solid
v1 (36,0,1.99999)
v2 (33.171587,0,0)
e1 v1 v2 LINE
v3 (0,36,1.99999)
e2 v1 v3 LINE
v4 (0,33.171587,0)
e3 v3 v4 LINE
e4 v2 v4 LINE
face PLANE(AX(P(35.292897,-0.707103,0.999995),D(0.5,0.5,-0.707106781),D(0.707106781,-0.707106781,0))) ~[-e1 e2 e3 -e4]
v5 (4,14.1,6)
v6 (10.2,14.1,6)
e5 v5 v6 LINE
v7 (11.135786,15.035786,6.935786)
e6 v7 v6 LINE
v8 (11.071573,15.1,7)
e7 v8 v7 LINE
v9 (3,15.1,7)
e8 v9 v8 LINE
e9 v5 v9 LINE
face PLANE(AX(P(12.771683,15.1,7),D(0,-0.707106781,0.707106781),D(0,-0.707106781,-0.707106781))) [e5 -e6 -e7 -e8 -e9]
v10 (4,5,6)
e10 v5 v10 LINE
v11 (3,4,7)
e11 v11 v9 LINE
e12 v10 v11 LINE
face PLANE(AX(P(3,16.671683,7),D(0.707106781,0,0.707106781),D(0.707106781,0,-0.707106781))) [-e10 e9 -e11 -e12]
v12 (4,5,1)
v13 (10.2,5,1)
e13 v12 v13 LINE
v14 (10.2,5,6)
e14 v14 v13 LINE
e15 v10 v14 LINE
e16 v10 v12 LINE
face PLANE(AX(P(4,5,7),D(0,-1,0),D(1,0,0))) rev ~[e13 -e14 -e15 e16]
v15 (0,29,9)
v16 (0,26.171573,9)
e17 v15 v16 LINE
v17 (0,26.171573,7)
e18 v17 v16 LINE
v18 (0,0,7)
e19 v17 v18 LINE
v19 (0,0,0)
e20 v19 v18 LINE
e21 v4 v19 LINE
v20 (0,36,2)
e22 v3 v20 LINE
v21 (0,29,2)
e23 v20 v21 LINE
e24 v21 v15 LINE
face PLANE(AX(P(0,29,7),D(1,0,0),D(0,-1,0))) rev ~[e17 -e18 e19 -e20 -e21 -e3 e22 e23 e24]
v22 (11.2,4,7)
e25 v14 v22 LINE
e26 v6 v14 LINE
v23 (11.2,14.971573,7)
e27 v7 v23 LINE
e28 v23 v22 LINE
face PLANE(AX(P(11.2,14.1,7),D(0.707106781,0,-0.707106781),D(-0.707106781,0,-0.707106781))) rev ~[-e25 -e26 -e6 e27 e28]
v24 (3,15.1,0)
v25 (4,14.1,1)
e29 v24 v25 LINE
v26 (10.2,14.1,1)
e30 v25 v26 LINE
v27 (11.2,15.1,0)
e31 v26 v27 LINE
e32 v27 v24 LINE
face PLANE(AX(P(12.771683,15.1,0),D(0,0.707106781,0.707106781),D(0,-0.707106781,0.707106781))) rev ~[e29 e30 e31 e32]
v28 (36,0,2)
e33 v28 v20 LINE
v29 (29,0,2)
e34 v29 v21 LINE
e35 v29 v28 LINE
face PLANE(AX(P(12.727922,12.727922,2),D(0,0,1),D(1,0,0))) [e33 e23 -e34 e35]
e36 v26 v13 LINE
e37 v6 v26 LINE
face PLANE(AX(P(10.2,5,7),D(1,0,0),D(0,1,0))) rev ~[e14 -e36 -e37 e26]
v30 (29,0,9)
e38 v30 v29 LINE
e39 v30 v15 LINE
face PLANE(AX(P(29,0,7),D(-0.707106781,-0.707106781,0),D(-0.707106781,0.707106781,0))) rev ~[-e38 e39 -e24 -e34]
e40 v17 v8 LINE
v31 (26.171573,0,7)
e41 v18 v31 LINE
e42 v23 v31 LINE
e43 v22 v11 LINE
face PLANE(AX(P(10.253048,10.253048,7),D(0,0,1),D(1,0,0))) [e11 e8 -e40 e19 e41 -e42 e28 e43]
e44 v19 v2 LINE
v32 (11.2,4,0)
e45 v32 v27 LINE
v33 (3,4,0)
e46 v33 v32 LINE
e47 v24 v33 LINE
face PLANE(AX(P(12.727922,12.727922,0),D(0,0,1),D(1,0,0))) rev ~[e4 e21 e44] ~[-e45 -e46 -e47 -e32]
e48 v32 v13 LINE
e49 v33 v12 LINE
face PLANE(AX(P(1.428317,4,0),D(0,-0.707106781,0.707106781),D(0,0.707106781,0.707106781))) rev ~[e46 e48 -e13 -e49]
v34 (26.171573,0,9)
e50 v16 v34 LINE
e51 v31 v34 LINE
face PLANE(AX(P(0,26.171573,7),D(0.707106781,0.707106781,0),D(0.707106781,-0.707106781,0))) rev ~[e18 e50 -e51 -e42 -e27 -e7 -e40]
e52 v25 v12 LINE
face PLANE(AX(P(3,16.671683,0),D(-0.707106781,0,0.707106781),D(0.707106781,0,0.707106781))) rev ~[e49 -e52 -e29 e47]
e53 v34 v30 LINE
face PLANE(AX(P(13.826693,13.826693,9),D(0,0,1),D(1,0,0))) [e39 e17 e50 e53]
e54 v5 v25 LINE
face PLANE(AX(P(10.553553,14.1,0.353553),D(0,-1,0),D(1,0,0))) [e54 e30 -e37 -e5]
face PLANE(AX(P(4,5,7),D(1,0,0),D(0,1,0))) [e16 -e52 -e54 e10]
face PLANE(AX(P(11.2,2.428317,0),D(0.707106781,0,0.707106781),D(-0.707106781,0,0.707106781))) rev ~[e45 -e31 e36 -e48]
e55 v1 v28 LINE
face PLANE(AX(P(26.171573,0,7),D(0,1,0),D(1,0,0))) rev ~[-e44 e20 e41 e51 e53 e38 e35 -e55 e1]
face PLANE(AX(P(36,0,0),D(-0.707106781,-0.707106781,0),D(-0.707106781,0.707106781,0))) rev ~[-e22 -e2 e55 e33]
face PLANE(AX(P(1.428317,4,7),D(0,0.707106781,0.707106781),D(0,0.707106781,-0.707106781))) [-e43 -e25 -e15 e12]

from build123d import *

# Parameters (mm, degrees)
F1_DEPTH     = 2
F3_DEPTH     = 5
F5_DEPTH     = 2
F6_W         = 6.2
F6_H         = 9.1
F7_DEPTH     = 7.001
F8_T1_DEPTH  = 9.1
F8_T3_DEPTH  = 6.2
F8_T9_DEPTH  = 8.771682988
F8_T13_DEPTH = 11.671682988
F8_T20_DEPTH = 11.671682988
F8_T24_DEPTH = 8.771682988
F8_T31_DEPTH = 8.771682988
F8_T36_DEPTH = 11.671682988
F8_T44_DEPTH = 8.771682988
F8_T48_DEPTH = 11.671682988
F8_T55_DEPTH = 8.771682988
F8_T59_DEPTH = 11.671682988
F8_T66_DEPTH = 8.771682988
F8_T70_DEPTH = 11.671682988
F8_T77_DEPTH = 8.771682988
F8_T81_DEPTH = 11.671682988
F8_T88_DEPTH = 11.671682988
F8_T92_DEPTH = 8.771682988
F9_SIZE      = 1.99999


# Not quite as in the source:
# - a fillet or chamfer that OpenCascade refuses, or shapes differently, is made with other operations: its cross-section is extruded or revolved along the edge and cut away or added
# - a fillet or chamfer is up to 0.001 mm smaller than in the source, because OpenCascade refuses the exact size


with BuildPart() as f1:
    # F0 (on Top) → F1 (new body)
    with BuildSketch(Plane.XY):
        Polygon((0, 36), (0, 0), (36, 0), align=None)
    extrude(amount=F1_DEPTH)

    # F2 (on face) → F3 (join)
    with BuildSketch(Plane.XY.offset(2)):
        Polygon((0, 29), (0, 0), (29, 0), align=None)
    extrude(amount=F3_DEPTH)

    # F4 (on face) → F5 (join)
    with BuildSketch(Plane.XY.offset(7)):
        Polygon((29, 0), (0, 29), (0, 26.1715728753), (26.1715728753, 0), align=None)
    extrude(amount=F5_DEPTH)

    # F6 (on face) → F7 (cut, through all)
    with BuildSketch(Plane.XY.offset(7)):
        with Locations((7.1, 9.55)):
            Rectangle(F6_W, F6_H)
    extrude(amount=-F7_DEPTH, mode=Mode.SUBTRACT)

    # F8: chamfer of 1 on 8 edges, made by hand

    # F8_s2 → F8_t1 (cut)
    with BuildSketch(Plane.XZ.offset(-14.1)):
        Polygon((3, 7), (4, 6), (4, 7), align=None)
        Polygon((11.2, 7), (10.2, 6), (10.2, 7), align=None)
        Polygon((11.2, 0), (10.2, 1), (10.2, 0), align=None)
        Polygon((3, 0), (4, 1), (4, 0), align=None)
    extrude(amount=F8_T1_DEPTH, mode=Mode.SUBTRACT)

    # F8_s4 → F8_t3 (cut)
    with BuildSketch(Plane.YZ.offset(4)):
        Polygon((15.1, 7), (14.1, 6), (14.1, 7), align=None)
        Polygon((4, 7), (5, 6), (5, 7), align=None)
        Polygon((15.1, 0), (14.1, 1), (14.1, 0), align=None)
        Polygon((4, 0), (5, 1), (5, 0), align=None)
    extrude(amount=F8_T3_DEPTH, mode=Mode.SUBTRACT)


with BuildPart() as f8_tool7:
    # F8_s8 → F8_t9 (new body)
    with BuildSketch(Plane.YZ.offset(10.2)):
        Polygon((15.1, 7), (14.1, 6), (14.1, 7), align=None)
    extrude(amount=-F8_T9_DEPTH)

    split(bisect_by=Plane.YZ.offset(4), keep=Keep.BOTTOM)


with BuildPart() as f8_tool11:
    # F8_s12 → F8_t13 (new body)
    with BuildSketch(Plane.XZ.offset(-16.671682988)):
        Polygon((3, 7), (4, 6), (4, 7), align=None)
    extrude(amount=F8_T13_DEPTH)

    split(bisect_by=Plane.XZ.offset(-14.1), keep=Keep.BOTTOM)


with BuildPart() as f8_tool7_1:
    add(f8_tool7.part)

    # F8_t15: intersect F8_tool11
    add(f8_tool11.part, mode=Mode.INTERSECT)


with BuildPart() as f1_1:
    add(f1.part)

    # F8_t5: cut F8_tool7
    add(f8_tool7_1.part, mode=Mode.SUBTRACT)


with BuildPart() as f8_tool18:
    # F8_s19 → F8_t20 (new body)
    with BuildSketch(Plane.XZ.offset(-14.1)):
        Polygon((3, 7), (4, 6), (4, 7), align=None)
    extrude(amount=F8_T20_DEPTH)

    split(bisect_by=Plane.XZ.offset(-5), keep=Keep.TOP)


with BuildPart() as f8_tool22:
    # F8_s23 → F8_t24 (new body)
    with BuildSketch(Plane.YZ.offset(1.428317012)):
        Polygon((4, 7), (5, 6), (5, 7), align=None)
    extrude(amount=F8_T24_DEPTH)

    split(bisect_by=Plane.YZ.offset(4), keep=Keep.BOTTOM)


with BuildPart() as f8_tool18_1:
    add(f8_tool18.part)

    # F8_t26: intersect F8_tool22
    add(f8_tool22.part, mode=Mode.INTERSECT)


with BuildPart() as f1_2:
    add(f1_1.part)

    # F8_t16: cut F8_tool18
    add(f8_tool18_1.part, mode=Mode.SUBTRACT)


with BuildPart() as f8_tool29:
    # F8_s30 → F8_t31 (new body)
    with BuildSketch(Plane.YZ.offset(12.771682988)):
        Polygon((15.1, 7), (14.1, 6), (14.1, 7), align=None)
    extrude(amount=-F8_T31_DEPTH)

    split(bisect_by=Plane(origin=(13.0857864376, 13.0857864376, 0), x_dir=(0, 0, 1), z_dir=(-0.7071067812, -0.7071067812, 0)), keep=Keep.TOP)

    split(bisect_by=Plane.YZ.offset(10.2), keep=Keep.TOP)


with BuildPart() as f8_tool34:
    # F8_s35 → F8_t36 (new body)
    with BuildSketch(Plane.XZ.offset(-5)):
        Polygon((11.2, 7), (10.2, 6), (10.2, 7), align=None)
    extrude(amount=-F8_T36_DEPTH)

    split(bisect_by=Plane(origin=(13.0857864376, 13.0857864376, 0), x_dir=(0, 0, 1), z_dir=(-0.7071067812, -0.7071067812, 0)), keep=Keep.TOP)

    split(bisect_by=Plane.XZ.offset(-14.1), keep=Keep.BOTTOM)


with BuildPart() as f8_tool29_1:
    add(f8_tool29.part)

    # F8_t39: intersect F8_tool34
    add(f8_tool34.part, mode=Mode.INTERSECT)


with BuildPart() as f1_3:
    add(f1_2.part)

    # F8_t27: cut F8_tool29
    add(f8_tool29_1.part, mode=Mode.SUBTRACT)


with BuildPart() as f8_tool42:
    # F8_s43 → F8_t44 (new body)
    with BuildSketch(Plane.YZ.offset(4)):
        Polygon((4, 7), (5, 6), (5, 7), align=None)
    extrude(amount=F8_T44_DEPTH)

    split(bisect_by=Plane.YZ.offset(10.2), keep=Keep.TOP)


with BuildPart() as f8_tool46:
    # F8_s47 → F8_t48 (new body)
    with BuildSketch(Plane.XZ.offset(-2.428317012)):
        Polygon((11.2, 7), (10.2, 6), (10.2, 7), align=None)
    extrude(amount=-F8_T48_DEPTH)

    split(bisect_by=Plane.XZ.offset(-5), keep=Keep.TOP)


with BuildPart() as f8_tool42_1:
    add(f8_tool42.part)

    # F8_t50: intersect F8_tool46
    add(f8_tool46.part, mode=Mode.INTERSECT)


with BuildPart() as f1_4:
    add(f1_3.part)

    # F8_t40: cut F8_tool42
    add(f8_tool42_1.part, mode=Mode.SUBTRACT)


with BuildPart() as f8_tool53:
    # F8_s54 → F8_t55 (new body)
    with BuildSketch(Plane.YZ.offset(12.771682988)):
        Polygon((15.1, 0), (14.1, 1), (14.1, 0), align=None)
    extrude(amount=-F8_T55_DEPTH)

    split(bisect_by=Plane.YZ.offset(10.2), keep=Keep.TOP)


with BuildPart() as f8_tool57:
    # F8_s58 → F8_t59 (new body)
    with BuildSketch(Plane.XZ.offset(-5)):
        Polygon((11.2, 0), (10.2, 1), (10.2, 0), align=None)
    extrude(amount=-F8_T59_DEPTH)

    split(bisect_by=Plane.XZ.offset(-14.1), keep=Keep.BOTTOM)


with BuildPart() as f8_tool53_1:
    add(f8_tool53.part)

    # F8_t61: intersect F8_tool57
    add(f8_tool57.part, mode=Mode.INTERSECT)


with BuildPart() as f1_5:
    add(f1_4.part)

    # F8_t51: cut F8_tool53
    add(f8_tool53_1.part, mode=Mode.SUBTRACT)


with BuildPart() as f8_tool64:
    # F8_s65 → F8_t66 (new body)
    with BuildSketch(Plane.YZ.offset(10.2)):
        Polygon((15.1, 0), (14.1, 1), (14.1, 0), align=None)
    extrude(amount=-F8_T66_DEPTH)

    split(bisect_by=Plane.YZ.offset(4), keep=Keep.BOTTOM)


with BuildPart() as f8_tool68:
    # F8_s69 → F8_t70 (new body)
    with BuildSketch(Plane.XZ.offset(-16.671682988)):
        Polygon((3, 0), (4, 1), (4, 0), align=None)
    extrude(amount=F8_T70_DEPTH)

    split(bisect_by=Plane.XZ.offset(-14.1), keep=Keep.BOTTOM)


with BuildPart() as f8_tool64_1:
    add(f8_tool64.part)

    # F8_t72: intersect F8_tool68
    add(f8_tool68.part, mode=Mode.INTERSECT)


with BuildPart() as f1_6:
    add(f1_5.part)

    # F8_t62: cut F8_tool64
    add(f8_tool64_1.part, mode=Mode.SUBTRACT)


with BuildPart() as f8_tool75:
    # F8_s76 → F8_t77 (new body)
    with BuildSketch(Plane.YZ.offset(4)):
        Polygon((4, 0), (5, 1), (5, 0), align=None)
    extrude(amount=F8_T77_DEPTH)

    split(bisect_by=Plane.YZ.offset(10.2), keep=Keep.TOP)


with BuildPart() as f8_tool79:
    # F8_s80 → F8_t81 (new body)
    with BuildSketch(Plane.XZ.offset(-2.428317012)):
        Polygon((11.2, 0), (10.2, 1), (10.2, 0), align=None)
    extrude(amount=-F8_T81_DEPTH)

    split(bisect_by=Plane.XZ.offset(-5), keep=Keep.TOP)


with BuildPart() as f8_tool75_1:
    add(f8_tool75.part)

    # F8_t83: intersect F8_tool79
    add(f8_tool79.part, mode=Mode.INTERSECT)


with BuildPart() as f1_7:
    add(f1_6.part)

    # F8_t73: cut F8_tool75
    add(f8_tool75_1.part, mode=Mode.SUBTRACT)


with BuildPart() as f8_tool86:
    # F8_s87 → F8_t88 (new body)
    with BuildSketch(Plane.XZ.offset(-14.1)):
        Polygon((3, 0), (4, 1), (4, 0), align=None)
    extrude(amount=F8_T88_DEPTH)

    split(bisect_by=Plane.XZ.offset(-5), keep=Keep.TOP)


with BuildPart() as f8_tool90:
    # F8_s91 → F8_t92 (new body)
    with BuildSketch(Plane.YZ.offset(1.428317012)):
        Polygon((4, 0), (5, 1), (5, 0), align=None)
    extrude(amount=F8_T92_DEPTH)

    split(bisect_by=Plane.YZ.offset(4), keep=Keep.BOTTOM)


with BuildPart() as f8_tool86_1:
    add(f8_tool86.part)

    # F8_t94: intersect F8_tool90
    add(f8_tool90.part, mode=Mode.INTERSECT)


with BuildPart() as f1_8:
    add(f1_7.part)

    # F8_t84: cut F8_tool86
    add(f8_tool86_1.part, mode=Mode.SUBTRACT)

    # F9 (size 2 in the source; OpenCascade refuses exactly that, so slightly less here)
    f9_edges = [f1_8.edges().sort_by_distance(p)[0] for p in [
        (18, 18, 0),
    ]]
    chamfer(f9_edges, length=F9_SIZE)


solid = f1_8.part
